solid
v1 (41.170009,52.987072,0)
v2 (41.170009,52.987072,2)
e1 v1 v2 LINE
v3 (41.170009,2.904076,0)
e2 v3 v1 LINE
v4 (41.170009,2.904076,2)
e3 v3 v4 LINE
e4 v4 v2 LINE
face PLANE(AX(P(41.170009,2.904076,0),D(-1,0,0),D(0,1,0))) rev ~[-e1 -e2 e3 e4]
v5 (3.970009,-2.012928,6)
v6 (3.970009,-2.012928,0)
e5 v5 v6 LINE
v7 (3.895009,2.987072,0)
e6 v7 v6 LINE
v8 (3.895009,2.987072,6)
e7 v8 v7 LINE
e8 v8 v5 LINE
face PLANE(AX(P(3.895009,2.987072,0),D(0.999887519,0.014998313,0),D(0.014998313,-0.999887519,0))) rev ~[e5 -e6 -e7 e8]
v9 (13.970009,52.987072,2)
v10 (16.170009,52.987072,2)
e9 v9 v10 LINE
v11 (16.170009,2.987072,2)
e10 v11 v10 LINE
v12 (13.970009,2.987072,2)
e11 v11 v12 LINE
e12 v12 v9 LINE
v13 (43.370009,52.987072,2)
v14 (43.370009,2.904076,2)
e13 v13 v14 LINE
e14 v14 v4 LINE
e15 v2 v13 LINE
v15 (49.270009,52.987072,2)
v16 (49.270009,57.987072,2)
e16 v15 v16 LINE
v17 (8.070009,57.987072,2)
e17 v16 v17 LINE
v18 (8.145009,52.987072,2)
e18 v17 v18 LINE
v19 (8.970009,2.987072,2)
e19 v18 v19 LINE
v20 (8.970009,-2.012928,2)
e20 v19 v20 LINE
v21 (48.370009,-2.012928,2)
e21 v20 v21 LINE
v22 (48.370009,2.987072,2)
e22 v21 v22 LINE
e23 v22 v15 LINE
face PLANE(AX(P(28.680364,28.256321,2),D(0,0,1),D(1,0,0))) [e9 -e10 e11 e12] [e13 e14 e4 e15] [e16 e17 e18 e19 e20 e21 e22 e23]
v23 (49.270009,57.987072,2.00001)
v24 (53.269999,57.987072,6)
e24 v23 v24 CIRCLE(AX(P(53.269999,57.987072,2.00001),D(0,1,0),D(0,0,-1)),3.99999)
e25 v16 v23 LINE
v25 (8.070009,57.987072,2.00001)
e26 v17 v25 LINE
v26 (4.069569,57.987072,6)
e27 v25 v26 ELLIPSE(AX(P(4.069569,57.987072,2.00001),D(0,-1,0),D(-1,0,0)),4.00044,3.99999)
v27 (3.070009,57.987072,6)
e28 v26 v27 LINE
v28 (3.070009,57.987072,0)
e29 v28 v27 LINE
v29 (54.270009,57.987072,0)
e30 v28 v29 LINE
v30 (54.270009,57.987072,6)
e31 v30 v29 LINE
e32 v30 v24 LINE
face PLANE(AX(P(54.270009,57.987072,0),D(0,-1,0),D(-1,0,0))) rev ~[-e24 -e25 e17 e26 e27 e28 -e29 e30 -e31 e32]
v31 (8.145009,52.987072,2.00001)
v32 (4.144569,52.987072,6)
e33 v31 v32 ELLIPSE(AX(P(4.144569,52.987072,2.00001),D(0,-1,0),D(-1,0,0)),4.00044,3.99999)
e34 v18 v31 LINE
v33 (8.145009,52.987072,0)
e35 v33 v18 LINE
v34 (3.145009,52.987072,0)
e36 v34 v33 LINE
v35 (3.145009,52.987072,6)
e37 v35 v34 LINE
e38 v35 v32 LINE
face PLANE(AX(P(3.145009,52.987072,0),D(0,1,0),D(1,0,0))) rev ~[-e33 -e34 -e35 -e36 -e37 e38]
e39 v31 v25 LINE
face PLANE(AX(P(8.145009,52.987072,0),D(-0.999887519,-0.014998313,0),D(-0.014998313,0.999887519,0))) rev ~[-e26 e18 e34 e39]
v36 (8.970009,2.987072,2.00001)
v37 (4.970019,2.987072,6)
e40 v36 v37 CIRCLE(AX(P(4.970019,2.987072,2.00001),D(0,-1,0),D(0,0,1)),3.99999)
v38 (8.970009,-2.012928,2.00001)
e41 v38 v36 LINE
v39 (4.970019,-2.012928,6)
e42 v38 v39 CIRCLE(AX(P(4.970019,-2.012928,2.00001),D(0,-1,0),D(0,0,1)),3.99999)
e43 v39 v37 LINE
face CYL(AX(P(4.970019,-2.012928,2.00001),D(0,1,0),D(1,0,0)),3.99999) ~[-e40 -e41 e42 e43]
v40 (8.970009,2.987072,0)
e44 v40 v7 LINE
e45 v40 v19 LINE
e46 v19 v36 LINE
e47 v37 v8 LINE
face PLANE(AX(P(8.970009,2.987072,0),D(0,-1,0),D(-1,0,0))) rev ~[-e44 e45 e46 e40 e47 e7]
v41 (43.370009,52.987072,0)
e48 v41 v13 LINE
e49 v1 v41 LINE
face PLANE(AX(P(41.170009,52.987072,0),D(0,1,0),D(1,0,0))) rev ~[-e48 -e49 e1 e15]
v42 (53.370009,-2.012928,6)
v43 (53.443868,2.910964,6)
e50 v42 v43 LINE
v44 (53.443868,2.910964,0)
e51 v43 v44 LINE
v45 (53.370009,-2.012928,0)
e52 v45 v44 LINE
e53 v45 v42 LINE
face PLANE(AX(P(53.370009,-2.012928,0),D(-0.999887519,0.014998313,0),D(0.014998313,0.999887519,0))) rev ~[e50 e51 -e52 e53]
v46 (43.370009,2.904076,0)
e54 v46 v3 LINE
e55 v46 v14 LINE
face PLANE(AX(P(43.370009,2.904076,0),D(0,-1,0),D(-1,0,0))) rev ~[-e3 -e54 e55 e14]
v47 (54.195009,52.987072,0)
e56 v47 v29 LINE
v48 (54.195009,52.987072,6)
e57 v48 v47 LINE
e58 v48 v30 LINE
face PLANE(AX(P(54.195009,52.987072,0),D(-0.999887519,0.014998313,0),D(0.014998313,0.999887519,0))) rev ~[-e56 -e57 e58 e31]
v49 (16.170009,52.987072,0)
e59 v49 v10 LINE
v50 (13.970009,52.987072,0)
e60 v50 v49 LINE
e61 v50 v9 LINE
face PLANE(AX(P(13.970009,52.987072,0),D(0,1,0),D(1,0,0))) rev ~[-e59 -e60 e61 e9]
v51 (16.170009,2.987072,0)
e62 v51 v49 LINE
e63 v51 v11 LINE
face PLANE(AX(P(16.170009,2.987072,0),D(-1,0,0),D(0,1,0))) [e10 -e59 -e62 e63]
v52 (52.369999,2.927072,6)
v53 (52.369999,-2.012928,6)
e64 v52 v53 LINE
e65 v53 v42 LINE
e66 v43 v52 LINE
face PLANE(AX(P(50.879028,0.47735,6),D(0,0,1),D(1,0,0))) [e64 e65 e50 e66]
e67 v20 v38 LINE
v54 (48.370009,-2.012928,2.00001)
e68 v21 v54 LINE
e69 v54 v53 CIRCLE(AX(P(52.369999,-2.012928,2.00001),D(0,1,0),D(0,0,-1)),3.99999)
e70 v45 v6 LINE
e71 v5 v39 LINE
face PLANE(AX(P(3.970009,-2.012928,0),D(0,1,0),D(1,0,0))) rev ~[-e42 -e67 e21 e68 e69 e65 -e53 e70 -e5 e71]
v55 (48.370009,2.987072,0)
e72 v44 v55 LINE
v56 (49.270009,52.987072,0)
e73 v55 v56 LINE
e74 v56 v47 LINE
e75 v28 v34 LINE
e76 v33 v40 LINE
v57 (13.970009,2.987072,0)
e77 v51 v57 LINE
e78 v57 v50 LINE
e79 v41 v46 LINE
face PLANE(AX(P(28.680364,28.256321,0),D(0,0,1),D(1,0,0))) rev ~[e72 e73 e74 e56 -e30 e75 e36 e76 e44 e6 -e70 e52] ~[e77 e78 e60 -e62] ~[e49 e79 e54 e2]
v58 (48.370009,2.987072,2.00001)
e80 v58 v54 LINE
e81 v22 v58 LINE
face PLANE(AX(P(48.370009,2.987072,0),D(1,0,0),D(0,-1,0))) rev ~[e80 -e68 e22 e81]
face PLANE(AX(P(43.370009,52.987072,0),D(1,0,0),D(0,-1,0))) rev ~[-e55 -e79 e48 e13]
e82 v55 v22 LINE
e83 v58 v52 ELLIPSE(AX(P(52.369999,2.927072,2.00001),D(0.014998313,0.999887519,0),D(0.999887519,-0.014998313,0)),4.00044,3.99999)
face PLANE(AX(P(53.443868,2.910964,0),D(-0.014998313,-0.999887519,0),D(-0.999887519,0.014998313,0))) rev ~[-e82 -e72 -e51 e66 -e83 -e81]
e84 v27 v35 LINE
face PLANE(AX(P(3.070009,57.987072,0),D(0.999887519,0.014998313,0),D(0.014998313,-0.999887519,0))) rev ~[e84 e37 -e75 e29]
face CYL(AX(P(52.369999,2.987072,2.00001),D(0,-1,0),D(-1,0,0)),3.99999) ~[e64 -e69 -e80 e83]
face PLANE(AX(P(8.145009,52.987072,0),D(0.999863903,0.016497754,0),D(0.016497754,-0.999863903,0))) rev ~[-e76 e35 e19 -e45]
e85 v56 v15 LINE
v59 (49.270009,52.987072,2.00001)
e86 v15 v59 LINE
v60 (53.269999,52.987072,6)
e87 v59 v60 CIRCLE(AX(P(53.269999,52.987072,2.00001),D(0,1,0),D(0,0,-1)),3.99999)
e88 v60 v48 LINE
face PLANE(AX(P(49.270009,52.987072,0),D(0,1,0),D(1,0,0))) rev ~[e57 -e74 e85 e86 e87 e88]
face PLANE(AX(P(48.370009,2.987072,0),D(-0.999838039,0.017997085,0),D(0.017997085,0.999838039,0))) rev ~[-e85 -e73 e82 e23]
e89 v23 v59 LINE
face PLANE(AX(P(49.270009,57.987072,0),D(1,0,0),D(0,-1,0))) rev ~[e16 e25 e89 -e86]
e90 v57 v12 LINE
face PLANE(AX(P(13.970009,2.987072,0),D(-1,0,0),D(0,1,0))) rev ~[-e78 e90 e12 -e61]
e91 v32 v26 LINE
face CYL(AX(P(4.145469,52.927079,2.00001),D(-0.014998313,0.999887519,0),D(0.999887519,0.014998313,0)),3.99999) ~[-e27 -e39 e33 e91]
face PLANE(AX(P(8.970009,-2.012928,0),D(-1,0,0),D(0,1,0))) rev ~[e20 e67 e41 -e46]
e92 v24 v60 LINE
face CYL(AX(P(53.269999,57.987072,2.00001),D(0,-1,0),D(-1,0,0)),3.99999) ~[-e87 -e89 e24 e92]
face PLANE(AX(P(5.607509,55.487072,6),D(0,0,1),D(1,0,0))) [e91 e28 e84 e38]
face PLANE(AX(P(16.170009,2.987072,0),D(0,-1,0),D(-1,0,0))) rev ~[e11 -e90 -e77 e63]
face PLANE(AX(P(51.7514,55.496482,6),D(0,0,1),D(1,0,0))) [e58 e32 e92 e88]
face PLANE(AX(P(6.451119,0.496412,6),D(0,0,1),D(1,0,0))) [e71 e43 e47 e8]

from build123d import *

# Parameters (mm, degrees)
F0_W     = 25
F0_H     = 50
F1_DEPTH = 2
F2_DEPTH = 6
F3_R     = 3.99999


# Not quite as in the source:
# - a fillet or chamfer is up to 0.001 mm smaller than in the source, because OpenCascade refuses the exact size


with BuildPart() as f1:
    # F0 (on Top) → F1 (new body)
    with BuildSketch(Plane.XY):
        Polygon((8.9700092217, 2.9870720308), (8.9700092217, -2.0129279692), (48.3700092217, -2.0129279692), (48.3700092217, 2.9870720308), (49.2700092217, 52.9870720308), (49.2700092217, 57.9870720308), (8.0700092217, 57.9870720308), (8.1450092217, 52.9870720308), align=None)
        Polygon((41.1700092217, 2.9040758964), (41.1700092217, 2.9870720308), (16.1700092217, 2.9870720308), (13.9700092217, 2.9870720308), (13.9700092217, 52.9870720308), (16.1700092217, 52.9870720308), (41.1700092217, 52.9870720308), (43.3700092217, 52.9870720308), (43.3700092217, 2.9040758964), align=None, mode=Mode.SUBTRACT)
        Polygon((49.2700092217, 57.9870720308), (49.2700092217, 52.9870720308), (54.1950092217, 52.9870720308), (54.2700092217, 57.9870720308), align=None)
        Polygon((3.0700092217, 57.9870720308), (3.1450092217, 52.9870720308), (8.1450092217, 52.9870720308), (8.0700092217, 57.9870720308), align=None)
        Polygon((3.8950092217, 2.9870720308), (3.9700092217, -2.0129279692), (8.9700092217, -2.0129279692), (8.9700092217, 2.9870720308), align=None)
        Polygon((48.3700092217, 2.9870720308), (48.3700092217, -2.0129279692), (53.3700092217, -2.0129279692), (53.4438676036, 2.910964155), align=None)
        with Locations((28.6700092217, 27.9870720308)):
            Rectangle(F0_W, F0_H)
    extrude(amount=F1_DEPTH)

    # F0 (on Top) → F2 (join)
    with BuildSketch(Plane.XY):
        Polygon((3.8950092217, 2.9870720308), (3.9700092217, -2.0129279692), (8.9700092217, -2.0129279692), (8.9700092217, 2.9870720308), align=None)
        Polygon((48.3700092217, 2.9870720308), (48.3700092217, -2.0129279692), (53.3700092217, -2.0129279692), (53.4438676036, 2.910964155), align=None)
        Polygon((49.2700092217, 57.9870720308), (49.2700092217, 52.9870720308), (54.1950092217, 52.9870720308), (54.2700092217, 57.9870720308), align=None)
        Polygon((3.0700092217, 57.9870720308), (3.1450092217, 52.9870720308), (8.1450092217, 52.9870720308), (8.0700092217, 57.9870720308), align=None)
    extrude(amount=F2_DEPTH)

    # F3 (radius 4 in the source; OpenCascade refuses exactly that, so slightly less here)
    f3_edges = [f1.edges().sort_by_distance(p)[0] for p in [
        (8.970009, 0.487072, 6),
        (8.107509, 55.487072, 6),
        (49.270009, 55.487072, 6),
        (48.370009, 0.487072, 6),
    ]]
    fillet(f3_edges, radius=F3_R)


solid = f1.part
